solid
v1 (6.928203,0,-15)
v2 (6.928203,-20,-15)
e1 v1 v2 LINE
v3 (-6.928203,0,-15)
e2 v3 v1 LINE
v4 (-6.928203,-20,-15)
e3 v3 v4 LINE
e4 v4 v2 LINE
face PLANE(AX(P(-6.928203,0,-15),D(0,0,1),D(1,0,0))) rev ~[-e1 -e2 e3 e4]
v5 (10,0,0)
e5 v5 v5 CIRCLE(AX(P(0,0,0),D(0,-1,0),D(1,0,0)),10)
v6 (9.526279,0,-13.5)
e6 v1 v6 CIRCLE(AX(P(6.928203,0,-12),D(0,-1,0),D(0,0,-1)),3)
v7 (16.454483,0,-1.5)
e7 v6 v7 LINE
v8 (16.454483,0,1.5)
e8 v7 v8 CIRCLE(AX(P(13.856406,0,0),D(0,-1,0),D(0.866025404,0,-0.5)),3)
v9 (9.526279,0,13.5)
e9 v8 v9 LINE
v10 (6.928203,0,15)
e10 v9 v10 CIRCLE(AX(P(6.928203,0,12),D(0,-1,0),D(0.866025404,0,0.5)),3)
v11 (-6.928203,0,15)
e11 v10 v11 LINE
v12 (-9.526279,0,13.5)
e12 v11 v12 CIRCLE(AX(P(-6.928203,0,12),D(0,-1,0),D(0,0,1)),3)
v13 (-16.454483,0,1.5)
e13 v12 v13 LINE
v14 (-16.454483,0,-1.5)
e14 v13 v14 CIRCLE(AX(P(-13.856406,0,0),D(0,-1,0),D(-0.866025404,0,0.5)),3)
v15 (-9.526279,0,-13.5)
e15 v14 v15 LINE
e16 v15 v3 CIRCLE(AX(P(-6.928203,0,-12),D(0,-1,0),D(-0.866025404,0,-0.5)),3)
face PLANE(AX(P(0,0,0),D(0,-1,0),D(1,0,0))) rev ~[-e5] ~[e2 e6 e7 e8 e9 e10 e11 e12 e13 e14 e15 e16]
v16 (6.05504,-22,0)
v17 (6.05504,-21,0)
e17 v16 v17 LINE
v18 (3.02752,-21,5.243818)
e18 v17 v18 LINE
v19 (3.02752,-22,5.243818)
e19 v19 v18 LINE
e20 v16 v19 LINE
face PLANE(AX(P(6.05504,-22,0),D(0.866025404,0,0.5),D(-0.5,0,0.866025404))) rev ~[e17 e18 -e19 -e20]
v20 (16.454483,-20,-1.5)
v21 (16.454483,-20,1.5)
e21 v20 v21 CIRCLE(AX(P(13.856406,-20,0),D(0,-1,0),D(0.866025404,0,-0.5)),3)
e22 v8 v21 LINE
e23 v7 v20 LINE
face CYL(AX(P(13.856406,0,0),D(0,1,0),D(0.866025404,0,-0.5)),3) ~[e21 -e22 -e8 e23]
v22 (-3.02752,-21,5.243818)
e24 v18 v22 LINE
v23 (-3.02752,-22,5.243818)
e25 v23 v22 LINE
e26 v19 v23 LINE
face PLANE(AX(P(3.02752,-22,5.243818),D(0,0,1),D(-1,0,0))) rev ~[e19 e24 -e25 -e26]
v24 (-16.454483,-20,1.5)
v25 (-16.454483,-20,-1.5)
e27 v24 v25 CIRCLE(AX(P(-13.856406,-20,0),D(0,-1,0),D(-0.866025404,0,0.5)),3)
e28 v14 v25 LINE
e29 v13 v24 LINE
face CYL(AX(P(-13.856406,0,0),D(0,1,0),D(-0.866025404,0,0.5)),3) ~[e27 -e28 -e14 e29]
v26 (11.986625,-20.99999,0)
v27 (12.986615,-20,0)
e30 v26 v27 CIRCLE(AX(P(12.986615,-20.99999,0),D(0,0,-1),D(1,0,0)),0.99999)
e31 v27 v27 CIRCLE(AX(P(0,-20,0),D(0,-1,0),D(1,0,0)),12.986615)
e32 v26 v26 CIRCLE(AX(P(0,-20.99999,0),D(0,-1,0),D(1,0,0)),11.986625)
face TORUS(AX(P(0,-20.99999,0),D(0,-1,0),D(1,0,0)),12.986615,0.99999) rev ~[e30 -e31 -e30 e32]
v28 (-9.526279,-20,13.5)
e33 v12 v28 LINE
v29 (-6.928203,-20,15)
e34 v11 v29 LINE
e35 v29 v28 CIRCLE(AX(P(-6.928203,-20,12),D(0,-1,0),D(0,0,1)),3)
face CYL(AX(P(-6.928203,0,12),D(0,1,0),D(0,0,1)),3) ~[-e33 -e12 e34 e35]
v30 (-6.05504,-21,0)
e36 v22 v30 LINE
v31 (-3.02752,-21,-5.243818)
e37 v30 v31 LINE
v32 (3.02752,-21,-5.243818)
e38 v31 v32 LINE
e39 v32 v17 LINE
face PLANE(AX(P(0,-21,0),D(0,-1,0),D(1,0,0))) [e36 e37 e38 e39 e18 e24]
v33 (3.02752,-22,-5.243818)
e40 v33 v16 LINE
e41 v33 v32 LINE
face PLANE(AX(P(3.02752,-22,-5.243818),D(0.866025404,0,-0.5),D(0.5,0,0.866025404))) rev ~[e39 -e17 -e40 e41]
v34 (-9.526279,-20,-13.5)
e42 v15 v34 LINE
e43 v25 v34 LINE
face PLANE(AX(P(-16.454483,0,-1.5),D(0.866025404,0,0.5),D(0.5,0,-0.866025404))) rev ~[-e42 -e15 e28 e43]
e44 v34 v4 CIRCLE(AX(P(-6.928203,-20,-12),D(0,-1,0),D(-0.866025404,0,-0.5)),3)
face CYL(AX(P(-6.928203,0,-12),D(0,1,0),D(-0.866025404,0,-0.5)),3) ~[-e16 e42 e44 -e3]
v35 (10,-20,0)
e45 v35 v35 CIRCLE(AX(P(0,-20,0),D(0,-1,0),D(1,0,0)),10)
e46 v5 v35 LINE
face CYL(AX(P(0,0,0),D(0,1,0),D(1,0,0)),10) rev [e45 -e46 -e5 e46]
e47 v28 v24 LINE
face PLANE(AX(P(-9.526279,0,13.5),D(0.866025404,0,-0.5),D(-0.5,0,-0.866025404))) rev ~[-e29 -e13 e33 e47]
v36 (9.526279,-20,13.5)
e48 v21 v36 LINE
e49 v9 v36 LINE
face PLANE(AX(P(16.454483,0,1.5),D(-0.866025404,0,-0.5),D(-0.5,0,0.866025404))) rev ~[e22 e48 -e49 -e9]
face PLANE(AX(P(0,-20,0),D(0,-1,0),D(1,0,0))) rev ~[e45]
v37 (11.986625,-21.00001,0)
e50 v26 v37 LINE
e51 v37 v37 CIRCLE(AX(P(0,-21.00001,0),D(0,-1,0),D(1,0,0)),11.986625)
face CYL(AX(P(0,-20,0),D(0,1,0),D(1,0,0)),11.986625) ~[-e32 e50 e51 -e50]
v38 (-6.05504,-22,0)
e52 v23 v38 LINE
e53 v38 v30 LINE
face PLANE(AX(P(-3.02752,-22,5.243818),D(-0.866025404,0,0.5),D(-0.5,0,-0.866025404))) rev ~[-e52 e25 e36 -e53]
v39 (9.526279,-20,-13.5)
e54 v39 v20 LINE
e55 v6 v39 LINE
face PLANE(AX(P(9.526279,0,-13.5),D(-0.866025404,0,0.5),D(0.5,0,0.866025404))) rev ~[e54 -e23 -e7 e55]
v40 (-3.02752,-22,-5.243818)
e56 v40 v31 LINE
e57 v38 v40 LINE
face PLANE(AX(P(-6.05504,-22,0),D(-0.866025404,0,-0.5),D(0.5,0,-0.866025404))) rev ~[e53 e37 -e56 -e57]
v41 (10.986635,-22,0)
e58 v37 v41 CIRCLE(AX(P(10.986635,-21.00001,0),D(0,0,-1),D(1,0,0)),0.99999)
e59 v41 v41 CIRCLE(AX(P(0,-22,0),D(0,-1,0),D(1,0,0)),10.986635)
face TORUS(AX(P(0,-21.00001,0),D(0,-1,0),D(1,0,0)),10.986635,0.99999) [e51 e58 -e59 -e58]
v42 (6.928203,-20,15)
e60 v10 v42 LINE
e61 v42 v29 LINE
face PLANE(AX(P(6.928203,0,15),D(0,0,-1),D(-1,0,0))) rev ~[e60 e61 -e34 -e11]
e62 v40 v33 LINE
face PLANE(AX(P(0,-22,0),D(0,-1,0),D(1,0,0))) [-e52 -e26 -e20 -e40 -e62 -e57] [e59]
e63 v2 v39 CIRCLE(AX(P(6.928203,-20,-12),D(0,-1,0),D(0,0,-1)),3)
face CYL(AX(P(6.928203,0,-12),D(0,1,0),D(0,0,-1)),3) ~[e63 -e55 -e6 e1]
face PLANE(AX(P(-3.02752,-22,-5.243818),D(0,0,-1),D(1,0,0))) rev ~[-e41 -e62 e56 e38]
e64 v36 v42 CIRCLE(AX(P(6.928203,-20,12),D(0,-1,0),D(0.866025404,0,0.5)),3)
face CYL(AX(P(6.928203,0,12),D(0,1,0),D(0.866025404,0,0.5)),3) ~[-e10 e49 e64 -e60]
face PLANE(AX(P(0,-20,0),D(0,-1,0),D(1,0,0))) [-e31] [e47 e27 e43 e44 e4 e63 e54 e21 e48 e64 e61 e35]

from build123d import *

# Parameters (mm, degrees)
F0_R     = 10
F1_DEPTH = 20
F2_R     = 11.9866247271
F3_DEPTH = 2
F4_R     = 0.99999
F6_DEPTH = 1


# Not quite as in the source:
# - a fillet or chamfer is up to 0.001 mm smaller than in the source, because OpenCascade refuses the exact size


with BuildPart() as f1:
    # F0 (on Front) → F1 (new body)
    with BuildSketch(Plane.XZ):
        with BuildLine():
            Line((6.9282032303, 15), (-6.9282032303, 15))
            ThreePointArc((-6.9282032303, 15), (-8.4282032303, 14.5980762114), (-9.5262794416, 13.5))
            Line((-9.5262794416, 13.5), (-16.4544826719, 1.5))
            ThreePointArc((-16.4544826719, 1.5), (-16.8564064606, 0), (-16.4544826719, -1.5))
            Line((-16.4544826719, -1.5), (-9.5262794416, -13.5))
            ThreePointArc((-9.5262794416, -13.5), (-8.4282032303, -14.5980762114), (-6.9282032303, -15))
            Line((-6.9282032303, -15), (6.9282032303, -15))
            ThreePointArc((6.9282032303, -15), (8.4282032303, -14.5980762114), (9.5262794416, -13.5))
            Line((9.5262794416, -13.5), (16.4544826719, -1.5))
            ThreePointArc((16.4544826719, -1.5), (16.8564064606, 0), (16.4544826719, 1.5))
            Line((16.4544826719, 1.5), (9.5262794416, 13.5))
            ThreePointArc((9.5262794416, 13.5), (8.4282032303, 14.5980762114), (6.9282032303, 15))
        make_face()
        Circle(F0_R, mode=Mode.SUBTRACT)
    extrude(amount=F1_DEPTH)

    # F2 (on face) → F3 (join)
    with BuildSketch(Plane.XZ.offset(20)):
        Circle(F2_R)
    extrude(amount=F3_DEPTH)

    # F4 (radius 1 in the source; OpenCascade refuses exactly that, so slightly less here)
    f4_edges = [f1.edges().sort_by_distance(p)[0] for p in [
        (-11.986625, -22, 0),
        (-11.986625, -20, 0),
    ]]
    fillet(f4_edges, radius=F4_R)

    # F5 (on face) → F6 (cut)
    with BuildSketch(Plane.XZ.offset(22)):
        Polygon((3.027519893, 5.2438182756), (-3.027519893, 5.2438182756), (-6.055039786, 0), (-3.027519893, -5.2438182756), (3.027519893, -5.2438182756), (6.055039786, 0), align=None)
    extrude(amount=-F6_DEPTH, mode=Mode.SUBTRACT)


solid = f1.part
